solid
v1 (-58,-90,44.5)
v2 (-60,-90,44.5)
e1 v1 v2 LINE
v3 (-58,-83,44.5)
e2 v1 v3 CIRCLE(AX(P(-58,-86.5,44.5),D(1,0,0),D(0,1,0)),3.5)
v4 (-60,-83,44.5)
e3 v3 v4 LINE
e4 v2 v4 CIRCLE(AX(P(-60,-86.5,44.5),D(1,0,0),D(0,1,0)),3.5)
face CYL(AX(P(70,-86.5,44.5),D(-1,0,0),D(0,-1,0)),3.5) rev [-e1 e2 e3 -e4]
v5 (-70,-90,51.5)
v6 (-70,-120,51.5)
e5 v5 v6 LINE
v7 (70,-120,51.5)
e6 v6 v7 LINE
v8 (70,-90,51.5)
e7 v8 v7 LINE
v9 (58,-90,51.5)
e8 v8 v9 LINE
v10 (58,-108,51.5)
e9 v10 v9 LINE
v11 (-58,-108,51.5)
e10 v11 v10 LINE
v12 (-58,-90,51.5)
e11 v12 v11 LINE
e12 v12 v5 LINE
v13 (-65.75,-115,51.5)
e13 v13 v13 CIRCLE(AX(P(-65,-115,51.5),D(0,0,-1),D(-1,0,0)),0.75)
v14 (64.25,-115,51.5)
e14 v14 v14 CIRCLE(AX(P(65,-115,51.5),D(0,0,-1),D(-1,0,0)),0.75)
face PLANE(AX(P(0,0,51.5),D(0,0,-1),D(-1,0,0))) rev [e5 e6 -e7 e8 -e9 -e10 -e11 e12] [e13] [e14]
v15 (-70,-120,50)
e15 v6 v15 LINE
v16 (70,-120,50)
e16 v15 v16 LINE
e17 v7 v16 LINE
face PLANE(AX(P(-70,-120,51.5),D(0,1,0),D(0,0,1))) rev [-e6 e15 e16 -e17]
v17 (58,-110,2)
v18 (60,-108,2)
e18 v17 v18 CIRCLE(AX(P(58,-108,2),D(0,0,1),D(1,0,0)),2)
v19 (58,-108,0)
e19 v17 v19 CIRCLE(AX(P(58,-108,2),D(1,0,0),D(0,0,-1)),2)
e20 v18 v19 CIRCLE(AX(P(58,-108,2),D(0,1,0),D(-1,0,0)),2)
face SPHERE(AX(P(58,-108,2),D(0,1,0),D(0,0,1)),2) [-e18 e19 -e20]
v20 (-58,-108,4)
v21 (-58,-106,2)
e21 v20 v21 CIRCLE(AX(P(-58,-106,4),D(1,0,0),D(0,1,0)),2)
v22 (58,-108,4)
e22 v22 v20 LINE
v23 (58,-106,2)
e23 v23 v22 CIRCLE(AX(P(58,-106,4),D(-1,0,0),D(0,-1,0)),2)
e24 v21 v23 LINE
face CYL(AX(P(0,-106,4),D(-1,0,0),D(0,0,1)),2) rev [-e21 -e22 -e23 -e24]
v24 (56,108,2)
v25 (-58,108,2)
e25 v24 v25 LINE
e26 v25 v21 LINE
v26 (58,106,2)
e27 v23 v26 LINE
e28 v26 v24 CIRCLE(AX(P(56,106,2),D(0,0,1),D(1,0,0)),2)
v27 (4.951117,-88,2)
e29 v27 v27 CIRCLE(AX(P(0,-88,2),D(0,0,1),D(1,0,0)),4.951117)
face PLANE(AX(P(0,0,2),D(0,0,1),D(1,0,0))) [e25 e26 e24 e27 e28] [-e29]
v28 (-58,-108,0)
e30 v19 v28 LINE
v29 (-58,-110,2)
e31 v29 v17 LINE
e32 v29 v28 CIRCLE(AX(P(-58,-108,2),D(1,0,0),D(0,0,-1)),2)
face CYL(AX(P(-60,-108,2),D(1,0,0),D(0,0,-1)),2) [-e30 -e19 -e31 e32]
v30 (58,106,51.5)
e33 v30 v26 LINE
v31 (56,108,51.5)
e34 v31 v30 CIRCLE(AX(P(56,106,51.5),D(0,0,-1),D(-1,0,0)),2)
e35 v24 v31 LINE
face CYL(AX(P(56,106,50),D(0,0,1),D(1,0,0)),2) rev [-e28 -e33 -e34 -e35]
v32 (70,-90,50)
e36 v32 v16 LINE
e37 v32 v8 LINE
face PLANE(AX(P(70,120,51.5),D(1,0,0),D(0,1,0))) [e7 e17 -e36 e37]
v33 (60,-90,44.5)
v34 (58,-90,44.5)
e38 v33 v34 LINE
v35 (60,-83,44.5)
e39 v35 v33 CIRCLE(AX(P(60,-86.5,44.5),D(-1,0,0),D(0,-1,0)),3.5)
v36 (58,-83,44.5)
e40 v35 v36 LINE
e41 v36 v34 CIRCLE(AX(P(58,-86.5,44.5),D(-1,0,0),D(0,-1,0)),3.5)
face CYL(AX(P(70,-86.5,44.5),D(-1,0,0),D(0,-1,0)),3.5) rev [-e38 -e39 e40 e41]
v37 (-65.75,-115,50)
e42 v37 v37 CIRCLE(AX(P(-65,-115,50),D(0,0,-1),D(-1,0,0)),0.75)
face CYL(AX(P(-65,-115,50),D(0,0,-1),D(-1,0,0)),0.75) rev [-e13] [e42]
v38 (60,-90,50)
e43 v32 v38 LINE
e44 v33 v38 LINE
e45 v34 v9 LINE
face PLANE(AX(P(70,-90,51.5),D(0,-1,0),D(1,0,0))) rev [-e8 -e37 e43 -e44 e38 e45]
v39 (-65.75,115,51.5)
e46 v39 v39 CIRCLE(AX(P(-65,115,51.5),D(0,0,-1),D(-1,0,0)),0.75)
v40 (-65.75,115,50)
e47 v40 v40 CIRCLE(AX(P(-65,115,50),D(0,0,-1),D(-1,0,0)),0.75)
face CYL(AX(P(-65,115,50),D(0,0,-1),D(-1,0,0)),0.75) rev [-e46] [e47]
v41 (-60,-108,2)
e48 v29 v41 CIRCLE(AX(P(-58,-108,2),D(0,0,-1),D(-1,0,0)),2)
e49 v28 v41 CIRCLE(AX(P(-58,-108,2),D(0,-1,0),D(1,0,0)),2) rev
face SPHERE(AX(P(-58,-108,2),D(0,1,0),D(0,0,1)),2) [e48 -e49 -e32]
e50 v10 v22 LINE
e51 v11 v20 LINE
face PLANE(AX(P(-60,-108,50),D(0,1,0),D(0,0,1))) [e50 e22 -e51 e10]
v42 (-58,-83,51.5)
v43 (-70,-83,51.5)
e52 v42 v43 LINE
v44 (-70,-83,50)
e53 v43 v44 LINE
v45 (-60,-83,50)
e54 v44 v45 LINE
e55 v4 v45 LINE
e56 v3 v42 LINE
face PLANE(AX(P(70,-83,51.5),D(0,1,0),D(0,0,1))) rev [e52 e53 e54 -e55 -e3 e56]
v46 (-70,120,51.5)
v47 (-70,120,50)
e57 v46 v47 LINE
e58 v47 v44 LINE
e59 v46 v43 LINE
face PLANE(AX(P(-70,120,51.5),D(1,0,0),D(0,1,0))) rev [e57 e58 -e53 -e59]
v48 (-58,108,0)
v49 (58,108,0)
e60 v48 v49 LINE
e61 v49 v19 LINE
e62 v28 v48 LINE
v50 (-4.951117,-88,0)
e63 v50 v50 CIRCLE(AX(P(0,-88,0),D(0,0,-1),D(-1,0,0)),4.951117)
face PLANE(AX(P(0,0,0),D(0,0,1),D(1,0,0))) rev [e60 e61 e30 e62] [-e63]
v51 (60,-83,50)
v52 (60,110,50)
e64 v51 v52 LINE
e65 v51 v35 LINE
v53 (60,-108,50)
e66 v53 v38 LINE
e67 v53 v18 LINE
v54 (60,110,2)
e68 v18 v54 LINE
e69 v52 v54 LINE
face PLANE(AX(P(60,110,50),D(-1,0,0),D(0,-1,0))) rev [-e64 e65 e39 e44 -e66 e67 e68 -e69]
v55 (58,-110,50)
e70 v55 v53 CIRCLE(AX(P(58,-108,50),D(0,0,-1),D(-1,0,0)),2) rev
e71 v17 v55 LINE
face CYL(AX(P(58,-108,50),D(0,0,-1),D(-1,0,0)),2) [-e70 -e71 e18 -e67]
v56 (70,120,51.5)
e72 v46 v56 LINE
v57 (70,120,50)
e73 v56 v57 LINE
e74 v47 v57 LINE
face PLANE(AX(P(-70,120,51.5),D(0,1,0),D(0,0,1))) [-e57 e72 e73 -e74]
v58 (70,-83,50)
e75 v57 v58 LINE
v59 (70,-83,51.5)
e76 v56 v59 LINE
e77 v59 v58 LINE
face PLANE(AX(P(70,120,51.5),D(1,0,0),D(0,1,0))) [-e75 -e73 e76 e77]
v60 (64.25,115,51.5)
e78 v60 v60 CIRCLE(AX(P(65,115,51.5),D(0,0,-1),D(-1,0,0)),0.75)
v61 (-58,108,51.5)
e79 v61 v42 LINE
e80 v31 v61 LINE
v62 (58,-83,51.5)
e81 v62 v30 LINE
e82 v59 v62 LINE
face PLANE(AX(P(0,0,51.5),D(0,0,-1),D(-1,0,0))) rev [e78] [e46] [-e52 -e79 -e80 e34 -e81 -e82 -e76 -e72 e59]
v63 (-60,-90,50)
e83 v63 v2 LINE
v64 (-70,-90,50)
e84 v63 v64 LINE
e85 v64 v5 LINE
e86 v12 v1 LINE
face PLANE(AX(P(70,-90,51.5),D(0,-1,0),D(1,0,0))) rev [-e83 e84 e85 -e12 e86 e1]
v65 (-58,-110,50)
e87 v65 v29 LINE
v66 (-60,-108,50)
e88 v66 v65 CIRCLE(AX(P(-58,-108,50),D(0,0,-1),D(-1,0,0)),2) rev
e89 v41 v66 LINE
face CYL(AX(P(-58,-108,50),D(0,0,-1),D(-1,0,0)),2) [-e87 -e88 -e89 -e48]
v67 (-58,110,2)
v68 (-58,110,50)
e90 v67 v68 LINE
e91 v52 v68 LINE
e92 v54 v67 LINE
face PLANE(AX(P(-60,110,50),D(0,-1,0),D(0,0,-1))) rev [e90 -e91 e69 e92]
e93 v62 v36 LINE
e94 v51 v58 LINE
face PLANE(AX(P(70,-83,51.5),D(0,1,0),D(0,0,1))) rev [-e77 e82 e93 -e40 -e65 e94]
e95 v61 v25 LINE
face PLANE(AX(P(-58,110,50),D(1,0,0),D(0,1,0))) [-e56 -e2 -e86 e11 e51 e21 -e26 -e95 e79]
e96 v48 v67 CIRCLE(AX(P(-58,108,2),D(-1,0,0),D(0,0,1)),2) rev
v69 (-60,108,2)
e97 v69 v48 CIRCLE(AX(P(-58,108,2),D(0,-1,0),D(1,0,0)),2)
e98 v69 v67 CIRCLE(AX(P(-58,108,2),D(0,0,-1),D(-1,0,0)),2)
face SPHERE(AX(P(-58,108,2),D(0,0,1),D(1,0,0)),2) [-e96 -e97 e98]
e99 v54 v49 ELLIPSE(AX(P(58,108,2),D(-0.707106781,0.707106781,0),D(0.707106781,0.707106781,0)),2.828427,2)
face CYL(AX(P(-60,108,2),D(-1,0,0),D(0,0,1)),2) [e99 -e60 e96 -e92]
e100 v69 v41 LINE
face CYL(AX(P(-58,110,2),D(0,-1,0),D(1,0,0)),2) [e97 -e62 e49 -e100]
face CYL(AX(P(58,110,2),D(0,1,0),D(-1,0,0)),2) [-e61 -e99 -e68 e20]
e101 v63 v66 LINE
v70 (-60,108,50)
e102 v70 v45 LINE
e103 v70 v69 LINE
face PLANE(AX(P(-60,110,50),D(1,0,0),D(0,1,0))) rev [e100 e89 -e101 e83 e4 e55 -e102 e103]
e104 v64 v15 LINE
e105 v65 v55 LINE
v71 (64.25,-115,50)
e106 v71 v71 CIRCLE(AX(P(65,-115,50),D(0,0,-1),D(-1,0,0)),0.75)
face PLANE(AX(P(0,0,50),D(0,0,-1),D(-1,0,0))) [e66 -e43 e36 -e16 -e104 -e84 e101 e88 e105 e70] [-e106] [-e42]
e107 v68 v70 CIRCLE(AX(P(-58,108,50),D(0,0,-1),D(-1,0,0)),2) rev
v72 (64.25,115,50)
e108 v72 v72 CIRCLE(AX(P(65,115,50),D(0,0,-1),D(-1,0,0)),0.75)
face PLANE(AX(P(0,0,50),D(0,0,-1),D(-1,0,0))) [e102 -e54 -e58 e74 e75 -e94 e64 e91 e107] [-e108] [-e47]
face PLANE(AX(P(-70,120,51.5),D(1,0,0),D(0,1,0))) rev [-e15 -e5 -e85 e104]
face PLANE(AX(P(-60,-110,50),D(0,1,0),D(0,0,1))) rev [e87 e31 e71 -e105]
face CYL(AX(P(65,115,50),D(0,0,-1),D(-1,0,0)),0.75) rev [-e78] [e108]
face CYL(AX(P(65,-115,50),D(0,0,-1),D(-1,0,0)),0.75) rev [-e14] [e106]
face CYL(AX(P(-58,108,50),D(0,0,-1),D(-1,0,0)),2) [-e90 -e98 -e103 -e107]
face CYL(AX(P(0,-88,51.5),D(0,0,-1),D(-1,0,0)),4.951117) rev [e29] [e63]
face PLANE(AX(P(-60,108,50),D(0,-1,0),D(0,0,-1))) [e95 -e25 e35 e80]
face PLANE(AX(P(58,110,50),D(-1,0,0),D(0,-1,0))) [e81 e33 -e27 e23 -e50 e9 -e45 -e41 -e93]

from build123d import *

# Parameters (mm, degrees)
SKETCH1_W               = 120
SKETCH1_H               = 220
BOSS_EXTRUDE1_DEPTH     = 50
SKETCH2_W               = 140
SKETCH2_H               = 240
BOSS_EXTRUDE2_DEPTH     = 1.5
SHELL1_T                = 2
CUT_EXTRUDE1_DEPTH      = 183.855817518
CUT_EXTRUDE1_DEPTH_BACK = 183.855817518
FILLET1_R               = 2
FILLET2_R               = 2
SKETCH9_R               = 4.951117386
CUT_EXTRUDE2_DEPTH      = 149.162917088
F_1_5MM_DOWEL_HOLE1_D   = 1.5


with BuildPart() as part:
    # Sketch1 → Boss-Extrude1 (new body)
    with BuildSketch(Plane.XY):
        Rectangle(SKETCH1_W, SKETCH1_H)
    extrude(amount=BOSS_EXTRUDE1_DEPTH)

    # Sketch2 → Boss-Extrude2 (add)
    with BuildSketch(Plane.XY.offset(50)):
        Rectangle(SKETCH2_W, SKETCH2_H)
    extrude(amount=BOSS_EXTRUDE2_DEPTH)

    # Shell1
    # the kernel refuses this shell: the inside is offset whole and opened at the faces by hand
    shell1_offset = offset(amount=-SHELL1_T, mode=Mode.PRIVATE)
    shell1_offset = shell1_offset + extrude(shell1_offset.faces().sort_by_distance((0, 0, 49.5))[0], amount=SHELL1_T, mode=Mode.PRIVATE)
    add(shell1_offset, mode=Mode.SUBTRACT)

    # Sketch8 → Cut-Extrude1 (cut, two sides: drawn at the far end of the back side and taken through both)
    with BuildSketch(Plane.ZY.offset(-58).offset(-CUT_EXTRUDE1_DEPTH_BACK)):
        with BuildLine():
            Line((51.5, -83), (44.5, -83))
            ThreePointArc((44.5, -83), (41, -86.5), (44.5, -90))
            Line((44.5, -90), (51.5, -90))
            Line((51.5, -90), (51.5, -83))
        make_face()
    extrude(amount=CUT_EXTRUDE1_DEPTH + CUT_EXTRUDE1_DEPTH_BACK, mode=Mode.SUBTRACT)

    # Fillet1
    fillet1_edges = [part.edges().sort_by_distance(p)[0] for p in [
        (0, -108, 2),
        (-60, 0, 0),
        (0, 110, 0),
        (60, 0, 0),
    ]]
    fillet(fillet1_edges, radius=FILLET1_R)

    # Fillet2
    # the kernel refuses this fillet: 2 mm, written as the material it adds along each edge
    with BuildSketch(Plane(origin=(58, 108, 51.5), x_dir=(0, -1, 0), z_dir=(0, 0, -1))) as fillet2_piece_1:
        with BuildLine():
            CenterArc((FILLET2_R, FILLET2_R), FILLET2_R, 180, 90)
            Line((0, FILLET2_R), (0, 0))
            Line((0, 0), (FILLET2_R, 0))
        make_face()
    extrude(amount=49.5)
    # the kernel refuses this fillet: 2 mm, written as the material it takes off along each edge
    with BuildSketch(Plane(origin=(-58, 108, 2), x_dir=(0, 1, 0), z_dir=(-1, 0, 0))) as fillet2_2_piece_1_section:
        Polygon((0, 0), (FILLET2_R * 1.02, 0), (FILLET2_R * 1.02, FILLET2_R * 1.02), (0, FILLET2_R * 1.02), align=None)
    fillet2_2_piece_1 = extrude(amount=FILLET2_R * 1.02, mode=Mode.PRIVATE)
    fillet2_2_piece_1 = fillet2_2_piece_1 - Plane(origin=(-58, 108, 2), x_dir=(0, -0.7071067811865475, 0.7071067811865475), z_dir=(-1, 0, 0)) * Sphere(FILLET2_R, mode=Mode.PRIVATE)
    add(fillet2_2_piece_1, mode=Mode.SUBTRACT)
    with BuildSketch(Plane(origin=(60, -110, 2), x_dir=(-1, 0, 0), z_dir=(0, 0, 1)), Plane(origin=(-60, -110, 2), x_dir=(0, 1, 0), z_dir=(0, 0, 1))) as fillet2_2_piece_2:
        with BuildLine():
            CenterArc((FILLET2_R, -FILLET2_R), FILLET2_R, 90, 90)
            Line((0, -FILLET2_R), (0, 0))
            Line((0, 0), (FILLET2_R, 0))
        make_face()
    extrude(amount=48, mode=Mode.SUBTRACT)
    with BuildSketch(Plane(origin=(-60, 110, 2), x_dir=(0, -1, 0), z_dir=(0, 0, 1))) as fillet2_2_piece_3:
        with BuildLine():
            CenterArc((FILLET2_R, FILLET2_R), FILLET2_R, 180, 90)
            Line((0, FILLET2_R), (0, 0))
            Line((0, 0), (FILLET2_R, 0))
        make_face()
    extrude(amount=48, mode=Mode.SUBTRACT)
    with BuildSketch(Plane(origin=(58, -110, 0), x_dir=(0, 0, 1), z_dir=(-1, 0, 0))) as fillet2_2_piece_4:
        with BuildLine():
            CenterArc((FILLET2_R, FILLET2_R), FILLET2_R, 180, 90)
            Line((0, FILLET2_R), (0, 0))
            Line((0, 0), (FILLET2_R, 0))
        make_face()
    extrude(amount=116, mode=Mode.SUBTRACT)
    with BuildSketch(Plane(origin=(58, -110, 2), x_dir=(1, 0, 0), z_dir=(0, 0, 1))) as fillet2_2_piece_5:
        with BuildLine():
            CenterArc((2 - FILLET2_R, FILLET2_R), FILLET2_R, 270, 90)
            Line((2, FILLET2_R), (2, 0))
            Line((2, 0), (2 - FILLET2_R, 0))
        make_face()
    revolve(axis=Axis((58, -110, 2), (0, 1, 0)), revolution_arc=90, mode=Mode.SUBTRACT)
    with BuildSketch(Plane(origin=(-58, -110, 2), x_dir=(-1, 0, 0), z_dir=(0, 0, 1))) as fillet2_2_piece_6:
        with BuildLine():
            CenterArc((2 - FILLET2_R, -FILLET2_R), FILLET2_R, 0, 90)
            Line((2 - FILLET2_R, 0), (2, 0))
            Line((2, 0), (2, -FILLET2_R))
        make_face()
    revolve(axis=Axis((-58, -110, 2), (0, -1, 0)), revolution_arc=90, mode=Mode.SUBTRACT)

    # Sketch9 → Cut-Extrude2 (cut, through all)
    with BuildSketch(Plane(origin=(0, 0, 0), x_dir=(-1, 0, 0), z_dir=(0, 0, -1))):
        with Locations((0, -88)):
            Circle(SKETCH9_R)
    extrude(amount=-CUT_EXTRUDE2_DEPTH, mode=Mode.SUBTRACT)

    # Ø1.5mm Dowel Hole1 (through all)
    with Locations(Plane(origin=(-164.627139737, -264.125226739, 50), x_dir=(-1, 0, 0), z_dir=(0, 0, -1))):
        with Locations((-229.627139737, 379.125226739), (-99.627139737, 379.125226739), (-229.627139737, 149.125226739), (-99.627139737, 149.125226739)):
            Hole(F_1_5MM_DOWEL_HOLE1_D / 2)


solid = part.part
